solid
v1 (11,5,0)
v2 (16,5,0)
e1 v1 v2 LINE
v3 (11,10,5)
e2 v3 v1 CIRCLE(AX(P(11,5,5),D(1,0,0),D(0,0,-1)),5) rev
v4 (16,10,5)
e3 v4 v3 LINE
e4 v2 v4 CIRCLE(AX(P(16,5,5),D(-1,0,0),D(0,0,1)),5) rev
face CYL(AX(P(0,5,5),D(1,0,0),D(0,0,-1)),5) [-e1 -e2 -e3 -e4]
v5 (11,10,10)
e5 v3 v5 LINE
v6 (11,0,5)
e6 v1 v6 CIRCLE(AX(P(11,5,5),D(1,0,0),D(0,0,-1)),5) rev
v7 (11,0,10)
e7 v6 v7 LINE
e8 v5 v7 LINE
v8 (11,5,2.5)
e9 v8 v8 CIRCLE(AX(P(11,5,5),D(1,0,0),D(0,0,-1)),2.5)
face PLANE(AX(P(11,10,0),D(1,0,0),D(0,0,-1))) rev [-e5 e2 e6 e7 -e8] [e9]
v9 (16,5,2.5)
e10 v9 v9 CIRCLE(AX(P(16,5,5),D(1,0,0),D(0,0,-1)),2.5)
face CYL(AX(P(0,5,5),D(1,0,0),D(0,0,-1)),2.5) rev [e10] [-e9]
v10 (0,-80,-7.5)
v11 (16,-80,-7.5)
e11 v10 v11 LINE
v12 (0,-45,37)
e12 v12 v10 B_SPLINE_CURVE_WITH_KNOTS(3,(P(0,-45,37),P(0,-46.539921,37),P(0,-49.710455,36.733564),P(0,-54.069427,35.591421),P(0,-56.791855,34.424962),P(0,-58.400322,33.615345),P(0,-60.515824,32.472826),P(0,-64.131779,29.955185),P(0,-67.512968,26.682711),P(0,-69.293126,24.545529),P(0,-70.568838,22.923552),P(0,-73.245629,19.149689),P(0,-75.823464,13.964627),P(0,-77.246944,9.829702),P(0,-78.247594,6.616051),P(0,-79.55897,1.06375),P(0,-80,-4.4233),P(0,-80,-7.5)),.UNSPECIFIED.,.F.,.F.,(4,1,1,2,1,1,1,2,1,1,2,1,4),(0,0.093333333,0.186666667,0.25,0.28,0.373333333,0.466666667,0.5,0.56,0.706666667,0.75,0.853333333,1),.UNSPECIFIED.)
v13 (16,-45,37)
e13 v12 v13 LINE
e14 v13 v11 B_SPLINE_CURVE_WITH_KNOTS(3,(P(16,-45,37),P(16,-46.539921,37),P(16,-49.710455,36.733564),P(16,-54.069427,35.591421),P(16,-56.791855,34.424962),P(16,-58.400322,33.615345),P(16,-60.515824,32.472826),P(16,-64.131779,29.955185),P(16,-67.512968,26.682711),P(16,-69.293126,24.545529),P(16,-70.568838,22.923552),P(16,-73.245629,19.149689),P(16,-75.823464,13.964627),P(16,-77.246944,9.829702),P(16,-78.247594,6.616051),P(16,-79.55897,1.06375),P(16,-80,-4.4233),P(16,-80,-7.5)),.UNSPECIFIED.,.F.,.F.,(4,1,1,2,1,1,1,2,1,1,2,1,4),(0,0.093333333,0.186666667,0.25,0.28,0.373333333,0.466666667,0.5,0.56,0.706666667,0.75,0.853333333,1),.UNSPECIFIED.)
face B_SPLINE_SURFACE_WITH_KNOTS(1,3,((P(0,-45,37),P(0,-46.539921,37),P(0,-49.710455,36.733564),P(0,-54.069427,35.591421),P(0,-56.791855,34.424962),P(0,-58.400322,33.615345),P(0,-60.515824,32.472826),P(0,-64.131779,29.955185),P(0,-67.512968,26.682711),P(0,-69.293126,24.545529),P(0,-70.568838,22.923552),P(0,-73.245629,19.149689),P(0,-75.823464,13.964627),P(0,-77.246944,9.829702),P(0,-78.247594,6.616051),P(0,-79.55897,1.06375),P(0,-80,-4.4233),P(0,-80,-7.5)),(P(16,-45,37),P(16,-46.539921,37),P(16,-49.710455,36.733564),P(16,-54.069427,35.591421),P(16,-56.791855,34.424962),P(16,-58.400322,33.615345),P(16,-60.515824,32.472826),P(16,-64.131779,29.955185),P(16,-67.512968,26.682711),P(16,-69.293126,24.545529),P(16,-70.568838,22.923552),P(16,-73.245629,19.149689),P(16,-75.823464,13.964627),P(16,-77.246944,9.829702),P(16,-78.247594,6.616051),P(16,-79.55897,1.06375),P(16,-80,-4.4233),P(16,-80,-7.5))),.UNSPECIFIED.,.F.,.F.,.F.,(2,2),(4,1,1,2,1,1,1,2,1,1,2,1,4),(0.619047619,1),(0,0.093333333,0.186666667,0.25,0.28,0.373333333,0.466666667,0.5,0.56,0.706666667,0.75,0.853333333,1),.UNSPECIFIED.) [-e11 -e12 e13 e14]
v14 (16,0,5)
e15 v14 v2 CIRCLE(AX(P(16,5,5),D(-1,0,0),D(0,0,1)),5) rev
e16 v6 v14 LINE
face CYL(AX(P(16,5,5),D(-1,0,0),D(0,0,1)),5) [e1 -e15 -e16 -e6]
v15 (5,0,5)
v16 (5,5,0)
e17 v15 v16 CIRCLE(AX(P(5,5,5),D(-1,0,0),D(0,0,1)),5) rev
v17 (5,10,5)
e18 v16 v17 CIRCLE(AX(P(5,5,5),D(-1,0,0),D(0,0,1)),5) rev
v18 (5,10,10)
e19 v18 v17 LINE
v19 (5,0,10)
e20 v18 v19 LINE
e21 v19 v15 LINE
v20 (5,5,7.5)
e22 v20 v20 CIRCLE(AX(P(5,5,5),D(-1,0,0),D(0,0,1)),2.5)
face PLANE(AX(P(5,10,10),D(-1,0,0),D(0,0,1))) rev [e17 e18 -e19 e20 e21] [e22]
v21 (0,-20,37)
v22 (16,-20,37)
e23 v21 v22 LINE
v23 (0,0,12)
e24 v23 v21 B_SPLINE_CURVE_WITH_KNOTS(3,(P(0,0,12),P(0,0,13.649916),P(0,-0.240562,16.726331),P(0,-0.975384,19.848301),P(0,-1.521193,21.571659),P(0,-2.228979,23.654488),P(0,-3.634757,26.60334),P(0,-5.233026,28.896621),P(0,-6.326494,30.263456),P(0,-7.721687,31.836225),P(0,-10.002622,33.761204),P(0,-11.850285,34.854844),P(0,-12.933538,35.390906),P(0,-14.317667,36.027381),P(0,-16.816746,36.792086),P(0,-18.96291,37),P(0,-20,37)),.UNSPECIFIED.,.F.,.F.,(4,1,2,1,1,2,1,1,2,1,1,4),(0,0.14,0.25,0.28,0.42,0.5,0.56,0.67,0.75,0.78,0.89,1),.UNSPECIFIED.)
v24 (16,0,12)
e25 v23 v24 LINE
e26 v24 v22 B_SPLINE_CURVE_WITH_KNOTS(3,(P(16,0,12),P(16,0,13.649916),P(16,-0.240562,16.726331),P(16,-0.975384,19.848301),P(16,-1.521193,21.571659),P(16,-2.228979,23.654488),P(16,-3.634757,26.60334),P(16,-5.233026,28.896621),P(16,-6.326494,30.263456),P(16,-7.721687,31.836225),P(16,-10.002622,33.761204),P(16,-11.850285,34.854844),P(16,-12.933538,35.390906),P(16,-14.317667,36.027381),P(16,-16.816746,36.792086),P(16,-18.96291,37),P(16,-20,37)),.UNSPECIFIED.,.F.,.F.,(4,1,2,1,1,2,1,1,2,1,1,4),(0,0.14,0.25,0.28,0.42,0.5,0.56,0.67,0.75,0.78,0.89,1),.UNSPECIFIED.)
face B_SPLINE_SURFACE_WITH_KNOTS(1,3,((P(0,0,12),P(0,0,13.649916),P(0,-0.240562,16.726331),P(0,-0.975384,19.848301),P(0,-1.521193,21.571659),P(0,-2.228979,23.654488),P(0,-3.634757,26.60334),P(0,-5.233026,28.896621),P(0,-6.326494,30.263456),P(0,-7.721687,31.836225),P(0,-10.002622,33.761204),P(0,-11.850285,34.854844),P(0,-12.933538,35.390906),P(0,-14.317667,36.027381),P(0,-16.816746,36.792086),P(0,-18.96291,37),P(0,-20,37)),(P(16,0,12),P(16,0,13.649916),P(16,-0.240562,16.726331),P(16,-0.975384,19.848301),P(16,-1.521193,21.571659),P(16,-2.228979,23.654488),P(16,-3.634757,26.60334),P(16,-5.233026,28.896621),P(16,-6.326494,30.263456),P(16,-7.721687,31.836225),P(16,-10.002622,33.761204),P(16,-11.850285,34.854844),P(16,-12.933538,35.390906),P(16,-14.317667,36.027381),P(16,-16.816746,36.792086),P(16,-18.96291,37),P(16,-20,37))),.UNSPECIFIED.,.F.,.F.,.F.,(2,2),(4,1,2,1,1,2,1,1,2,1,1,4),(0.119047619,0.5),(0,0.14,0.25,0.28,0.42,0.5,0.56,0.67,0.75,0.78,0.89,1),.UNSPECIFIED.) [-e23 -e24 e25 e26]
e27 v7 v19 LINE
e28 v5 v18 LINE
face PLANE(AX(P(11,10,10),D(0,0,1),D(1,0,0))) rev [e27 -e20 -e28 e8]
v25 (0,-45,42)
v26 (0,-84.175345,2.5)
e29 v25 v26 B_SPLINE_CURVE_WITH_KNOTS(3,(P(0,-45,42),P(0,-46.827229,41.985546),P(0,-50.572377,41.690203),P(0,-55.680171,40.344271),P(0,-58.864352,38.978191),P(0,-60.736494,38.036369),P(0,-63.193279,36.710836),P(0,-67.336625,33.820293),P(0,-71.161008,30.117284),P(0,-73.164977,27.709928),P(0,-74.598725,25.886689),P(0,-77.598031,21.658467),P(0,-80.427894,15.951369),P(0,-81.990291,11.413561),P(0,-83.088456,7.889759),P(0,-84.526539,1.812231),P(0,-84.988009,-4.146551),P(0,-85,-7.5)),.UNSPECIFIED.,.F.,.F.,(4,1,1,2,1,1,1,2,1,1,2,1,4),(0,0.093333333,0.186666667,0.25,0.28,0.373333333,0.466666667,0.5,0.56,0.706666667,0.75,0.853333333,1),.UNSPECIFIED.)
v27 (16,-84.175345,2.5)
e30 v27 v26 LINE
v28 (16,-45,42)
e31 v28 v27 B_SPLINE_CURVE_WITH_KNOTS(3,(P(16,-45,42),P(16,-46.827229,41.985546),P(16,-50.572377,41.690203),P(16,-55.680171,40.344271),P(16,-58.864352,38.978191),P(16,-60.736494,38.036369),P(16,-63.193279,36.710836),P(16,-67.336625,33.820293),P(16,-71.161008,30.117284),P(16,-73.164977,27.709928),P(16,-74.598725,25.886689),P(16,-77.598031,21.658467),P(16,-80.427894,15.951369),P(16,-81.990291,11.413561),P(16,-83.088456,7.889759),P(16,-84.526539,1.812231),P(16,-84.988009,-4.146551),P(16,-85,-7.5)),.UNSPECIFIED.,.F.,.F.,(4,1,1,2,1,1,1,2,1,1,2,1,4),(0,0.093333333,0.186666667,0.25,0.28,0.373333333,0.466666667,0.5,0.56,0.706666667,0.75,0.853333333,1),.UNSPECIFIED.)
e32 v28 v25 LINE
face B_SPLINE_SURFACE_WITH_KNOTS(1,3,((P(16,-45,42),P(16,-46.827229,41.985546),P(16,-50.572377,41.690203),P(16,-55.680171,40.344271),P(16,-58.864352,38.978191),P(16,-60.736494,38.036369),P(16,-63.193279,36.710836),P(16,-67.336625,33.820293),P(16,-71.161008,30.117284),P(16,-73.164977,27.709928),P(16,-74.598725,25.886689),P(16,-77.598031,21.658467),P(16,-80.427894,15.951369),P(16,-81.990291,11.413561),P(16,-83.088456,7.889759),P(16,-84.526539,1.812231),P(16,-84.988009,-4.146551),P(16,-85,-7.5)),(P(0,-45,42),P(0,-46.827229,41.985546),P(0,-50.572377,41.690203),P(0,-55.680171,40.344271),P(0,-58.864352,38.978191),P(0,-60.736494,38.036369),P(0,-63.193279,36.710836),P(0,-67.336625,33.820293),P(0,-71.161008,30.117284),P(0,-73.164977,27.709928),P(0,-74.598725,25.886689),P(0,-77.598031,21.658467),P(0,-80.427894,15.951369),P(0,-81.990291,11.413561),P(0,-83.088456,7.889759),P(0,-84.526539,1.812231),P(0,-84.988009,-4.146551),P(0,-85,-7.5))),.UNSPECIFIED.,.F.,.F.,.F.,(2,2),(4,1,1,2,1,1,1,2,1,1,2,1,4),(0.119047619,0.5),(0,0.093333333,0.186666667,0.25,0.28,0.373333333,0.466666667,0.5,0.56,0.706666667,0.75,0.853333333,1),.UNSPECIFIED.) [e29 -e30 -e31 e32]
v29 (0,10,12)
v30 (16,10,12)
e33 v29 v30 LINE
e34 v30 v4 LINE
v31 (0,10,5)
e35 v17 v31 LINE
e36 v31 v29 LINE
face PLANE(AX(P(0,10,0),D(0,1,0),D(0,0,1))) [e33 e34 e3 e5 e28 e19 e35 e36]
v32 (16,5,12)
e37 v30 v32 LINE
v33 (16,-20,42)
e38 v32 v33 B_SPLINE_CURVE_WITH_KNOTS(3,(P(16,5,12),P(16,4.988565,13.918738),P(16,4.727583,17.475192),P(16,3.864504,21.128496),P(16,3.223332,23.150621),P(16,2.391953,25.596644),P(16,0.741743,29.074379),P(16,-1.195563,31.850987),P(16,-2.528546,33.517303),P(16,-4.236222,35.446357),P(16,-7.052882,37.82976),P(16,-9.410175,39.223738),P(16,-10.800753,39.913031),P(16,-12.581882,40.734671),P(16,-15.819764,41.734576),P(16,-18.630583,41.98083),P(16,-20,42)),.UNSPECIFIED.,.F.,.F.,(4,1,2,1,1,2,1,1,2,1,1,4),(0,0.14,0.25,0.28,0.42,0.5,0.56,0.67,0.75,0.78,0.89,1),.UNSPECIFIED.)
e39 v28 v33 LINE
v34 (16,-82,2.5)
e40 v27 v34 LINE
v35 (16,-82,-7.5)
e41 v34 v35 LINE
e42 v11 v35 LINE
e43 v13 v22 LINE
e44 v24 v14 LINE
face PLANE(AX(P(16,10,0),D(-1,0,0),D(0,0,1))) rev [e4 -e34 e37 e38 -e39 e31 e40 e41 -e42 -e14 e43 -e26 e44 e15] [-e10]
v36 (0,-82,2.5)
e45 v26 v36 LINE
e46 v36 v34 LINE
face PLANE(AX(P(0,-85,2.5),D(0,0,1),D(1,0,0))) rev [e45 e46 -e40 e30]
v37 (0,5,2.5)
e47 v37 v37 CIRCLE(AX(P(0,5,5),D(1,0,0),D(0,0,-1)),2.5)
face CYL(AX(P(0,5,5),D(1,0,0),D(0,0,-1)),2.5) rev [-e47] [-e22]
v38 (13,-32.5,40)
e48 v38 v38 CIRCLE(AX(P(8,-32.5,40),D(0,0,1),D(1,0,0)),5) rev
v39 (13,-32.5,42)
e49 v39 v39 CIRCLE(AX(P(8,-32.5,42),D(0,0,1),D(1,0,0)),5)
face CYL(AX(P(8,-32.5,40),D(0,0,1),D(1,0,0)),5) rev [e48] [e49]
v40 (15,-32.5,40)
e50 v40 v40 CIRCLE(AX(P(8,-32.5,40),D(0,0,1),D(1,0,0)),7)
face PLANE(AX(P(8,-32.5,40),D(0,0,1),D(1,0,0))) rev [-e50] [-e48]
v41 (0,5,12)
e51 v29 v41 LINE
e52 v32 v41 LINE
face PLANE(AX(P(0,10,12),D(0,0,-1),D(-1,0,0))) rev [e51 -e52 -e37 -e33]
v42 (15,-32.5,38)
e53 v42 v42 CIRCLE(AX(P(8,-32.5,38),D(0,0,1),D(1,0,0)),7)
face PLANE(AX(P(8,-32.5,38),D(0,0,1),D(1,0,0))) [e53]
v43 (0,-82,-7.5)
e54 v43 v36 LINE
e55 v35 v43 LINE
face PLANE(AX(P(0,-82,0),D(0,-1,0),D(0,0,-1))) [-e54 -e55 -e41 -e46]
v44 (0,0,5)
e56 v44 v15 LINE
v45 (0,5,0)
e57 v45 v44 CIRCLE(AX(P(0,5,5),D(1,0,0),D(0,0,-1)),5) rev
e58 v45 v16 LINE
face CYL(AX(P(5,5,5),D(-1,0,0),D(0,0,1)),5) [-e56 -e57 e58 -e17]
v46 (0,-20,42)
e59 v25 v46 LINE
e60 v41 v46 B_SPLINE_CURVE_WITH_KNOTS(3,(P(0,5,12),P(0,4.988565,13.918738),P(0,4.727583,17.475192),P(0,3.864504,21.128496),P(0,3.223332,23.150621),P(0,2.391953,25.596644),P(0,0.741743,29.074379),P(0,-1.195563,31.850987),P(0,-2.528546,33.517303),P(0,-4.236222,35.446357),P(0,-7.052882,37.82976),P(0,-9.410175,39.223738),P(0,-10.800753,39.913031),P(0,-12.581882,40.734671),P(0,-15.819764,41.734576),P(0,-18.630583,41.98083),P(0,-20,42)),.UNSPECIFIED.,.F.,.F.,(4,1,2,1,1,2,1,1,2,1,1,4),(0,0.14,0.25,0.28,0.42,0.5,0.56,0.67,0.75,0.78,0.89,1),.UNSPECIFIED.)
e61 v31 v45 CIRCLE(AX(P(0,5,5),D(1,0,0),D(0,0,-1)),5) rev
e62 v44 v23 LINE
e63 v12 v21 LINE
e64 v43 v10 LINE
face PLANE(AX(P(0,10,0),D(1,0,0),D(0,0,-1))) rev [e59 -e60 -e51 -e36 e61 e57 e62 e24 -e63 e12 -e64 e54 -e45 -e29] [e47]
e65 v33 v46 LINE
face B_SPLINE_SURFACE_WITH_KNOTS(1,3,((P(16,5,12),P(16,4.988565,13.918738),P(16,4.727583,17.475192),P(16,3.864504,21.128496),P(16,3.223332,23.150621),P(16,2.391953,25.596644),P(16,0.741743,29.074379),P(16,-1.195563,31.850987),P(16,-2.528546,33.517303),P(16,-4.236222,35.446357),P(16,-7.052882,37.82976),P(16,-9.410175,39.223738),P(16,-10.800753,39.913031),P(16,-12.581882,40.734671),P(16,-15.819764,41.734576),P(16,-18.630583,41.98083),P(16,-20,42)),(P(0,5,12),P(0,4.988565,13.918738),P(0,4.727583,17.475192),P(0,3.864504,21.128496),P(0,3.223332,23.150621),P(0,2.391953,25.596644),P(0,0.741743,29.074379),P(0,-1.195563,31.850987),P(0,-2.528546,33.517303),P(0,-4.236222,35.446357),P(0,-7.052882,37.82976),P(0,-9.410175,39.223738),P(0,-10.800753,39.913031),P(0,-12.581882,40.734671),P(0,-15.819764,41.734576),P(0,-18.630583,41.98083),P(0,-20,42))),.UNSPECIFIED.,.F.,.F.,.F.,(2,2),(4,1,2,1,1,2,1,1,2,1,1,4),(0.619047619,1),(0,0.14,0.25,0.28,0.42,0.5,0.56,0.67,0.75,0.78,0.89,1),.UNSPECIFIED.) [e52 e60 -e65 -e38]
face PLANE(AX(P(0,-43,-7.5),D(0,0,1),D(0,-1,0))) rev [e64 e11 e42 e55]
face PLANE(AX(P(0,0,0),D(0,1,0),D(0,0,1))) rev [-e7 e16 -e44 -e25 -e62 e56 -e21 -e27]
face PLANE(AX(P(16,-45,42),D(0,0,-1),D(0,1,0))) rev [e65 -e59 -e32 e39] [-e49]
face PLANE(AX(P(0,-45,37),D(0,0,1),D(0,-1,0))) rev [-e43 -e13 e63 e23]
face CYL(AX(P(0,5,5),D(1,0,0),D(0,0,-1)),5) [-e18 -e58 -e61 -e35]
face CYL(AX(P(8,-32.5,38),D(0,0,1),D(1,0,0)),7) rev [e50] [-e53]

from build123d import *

# Parameters (mm, degrees)
BOSS_EXTRUDE2_DEPTH     = 10
CUT_EXTRUDE1_DEPTH      = 20.104973175
CUT_EXTRUDE1_DEPTH_BACK = 20.104973175
SKETCH3_R               = 2.5
SWEEP2_DEPTH            = 16
SKETCH6_W               = 16
SKETCH6_H               = 5
BOSS_EXTRUDE3_DEPTH     = 25
SWEEP4_DEPTH            = 16
SKETCH10_R              = 5
CUT_EXTRUDE2_DEPTH      = 2
SKETCH11_R              = 7
CUT_EXTRUDE3_DEPTH      = 2
CUT_EXTRUDE4_DEPTH      = 3
FILLET1_R               = 5


# Read off the part's stored shape, not the designer's step: Sweep2, Sweep4
with BuildPart() as part:
    # Sketch1 → Boss-Extrude2 (new body)
    with BuildSketch(Plane(origin=(0, 0, 0), x_dir=(1, 0, 0), z_dir=(0, 1, 0))):
        Polygon((16, 0), (11, 0), (11, -10), (5, -10), (5, 0), (0, 0), (0, -12), (16, -12), align=None)
    extrude(amount=BOSS_EXTRUDE2_DEPTH)

    # Sketch3 → Cut-Extrude1 (cut, two sides: drawn at the far end of the back side and taken through both)
    with BuildSketch(Plane(origin=(5, 0, 0), x_dir=(0, 0, -1), z_dir=(1, 0, 0)).offset(-CUT_EXTRUDE1_DEPTH_BACK)):
        with Locations((-5, 5)):
            Circle(SKETCH3_R)
    extrude(amount=CUT_EXTRUDE1_DEPTH + CUT_EXTRUDE1_DEPTH_BACK, mode=Mode.SUBTRACT)

    # Sweep2 outline → Sweep2 (add)
    with BuildSketch(Plane.YZ):
        with BuildLine():
            Line((0, 12), (5, 12))
            add(Edge.make_bspline(
                [(5, 12), (4.988564835, 13.918737728), (4.727583023, 17.475192083), (3.864503942, 21.128495988), (3.223332084, 23.150620925), (2.391953002, 25.596644311), (0.741742694, 29.07437946), (-1.195562511, 31.850987055), (-2.528545692, 33.517302555), (-4.236222293, 35.44635739), (-7.052881596, 37.829760239), (-9.410175401, 39.223738473), (-10.800753457, 39.913031483), (-12.581881784, 40.734670966), (-15.819763626, 41.734575995), (-18.630582656, 41.980830062), (-20, 42)],
                knots=[0, 0, 0, 0, 0.14, 0.25, 0.25, 0.28, 0.42, 0.5, 0.5, 0.56, 0.67, 0.75, 0.75, 0.78, 0.89, 1, 1, 1, 1], degree=3))
            Line((-20, 42), (-20, 37))
            add(Edge.make_bspline(
                [(0, 12), (0, 13.649915823), (-0.240561875, 16.726331061), (-0.97538393, 19.848301285), (-1.521193083, 21.57165859), (-2.228979288, 23.654488426), (-3.634756743, 26.603340395), (-5.233025509, 28.896620946), (-6.326493526, 30.263455967), (-7.72168743, 31.836224776), (-10.002621636, 33.761203681), (-11.850285326, 34.854843846), (-12.93353849, 35.390906407), (-14.317667102, 36.027380757), (-16.81674582, 36.792085808), (-18.962910054, 37), (-20, 37)],
                knots=[0, 0, 0, 0, 0.14, 0.25, 0.25, 0.28, 0.42, 0.5, 0.5, 0.56, 0.67, 0.75, 0.75, 0.78, 0.89, 1, 1, 1, 1], degree=3))
        make_face()
    extrude(amount=SWEEP2_DEPTH)

    # Sketch6 → Boss-Extrude3 (add)
    with BuildSketch(Plane.XZ.offset(20)):
        with Locations((8, 39.5)):
            Rectangle(SKETCH6_W, SKETCH6_H)
    extrude(amount=BOSS_EXTRUDE3_DEPTH)

    # Sweep4 outline → Sweep4 (add)
    with BuildSketch(Plane.YZ):
        with BuildLine():
            add(Edge.make_bspline(
                [(-45, 37), (-46.539921435, 37), (-49.710455321, 36.733564359), (-54.069426949, 35.591421338), (-56.791855208, 34.424962301), (-58.400322026, 33.61534539), (-60.515823703, 32.472825795), (-64.131778614, 29.955184919), (-67.512968495, 26.682711344), (-69.293125668, 24.545529462), (-70.568838354, 22.923551904), (-73.245629189, 19.149689178), (-75.823464115, 13.964627374), (-77.246943912, 9.829702386), (-78.247594027, 6.616051335), (-79.558969896, 1.063749954), (-80, -4.423299828), (-80, -7.5)],
                knots=[0, 0, 0, 0, 0.093333333, 0.186666667, 0.25, 0.25, 0.28, 0.373333333, 0.466666667, 0.5, 0.5, 0.56, 0.706666667, 0.75, 0.75, 0.853333333, 1, 1, 1, 1], degree=3))
            Line((-45, 37), (-45, 42))
            add(Edge.make_bspline(
                [(-45, 42), (-46.827228691, 41.985546272), (-50.572377089, 41.690203176), (-55.680170711, 40.34427149), (-58.86435237, 38.978190659), (-60.736493627, 38.036368786), (-63.19327858, 36.710836458), (-67.336625432, 33.820292899), (-71.161008214, 30.117283698), (-73.164977368, 27.709927549), (-74.598724896, 25.886689015), (-77.598031299, 21.658467407), (-80.427894177, 15.95136859), (-81.990291212, 11.413560853), (-83.08845552, 7.889758882), (-84.526539356, 1.812231065), (-84.988008876, -4.14655051), (-85, -7.5)],
                knots=[0, 0, 0, 0, 0.093333333, 0.186666667, 0.25, 0.25, 0.28, 0.373333333, 0.466666667, 0.5, 0.5, 0.56, 0.706666667, 0.75, 0.75, 0.853333333, 1, 1, 1, 1], degree=3))
            Line((-85, -7.5), (-80, -7.5))
        make_face()
    extrude(amount=SWEEP4_DEPTH)

    # Sketch10 → Cut-Extrude2 (cut)
    with BuildSketch(Plane.XY.offset(42)):
        with Locations((8, -32.5)):
            Circle(SKETCH10_R)
    extrude(amount=-CUT_EXTRUDE2_DEPTH, mode=Mode.SUBTRACT)

    # Sketch11 → Cut-Extrude3 (cut)
    with BuildSketch(Plane.XY.offset(40)):
        with Locations((8, -32.5)):
            Circle(SKETCH11_R)
    extrude(amount=-CUT_EXTRUDE3_DEPTH, mode=Mode.SUBTRACT)

    # 3DSketch1 → Cut-Extrude4 (cut)
    with BuildSketch(Plane(origin=(0, -85, -7.5), x_dir=(0.8479983040050887, 0, 0.5299989400031789), z_dir=(0, 1, 0))):
        Polygon((0, 0), (13.567972864, 8.47998304), (18.867962264, 0), (5.2999894, -8.47998304), align=None)
    extrude(amount=CUT_EXTRUDE4_DEPTH, mode=Mode.SUBTRACT)

    # Fillet1
    fillet1_edges = [part.edges().sort_by_distance(p)[0] for p in [
        (13.5, 0, 0),
        (13.5, 10, 0),
        (2.5, 0, 0),
        (2.5, 10, 0),
    ]]
    fillet(fillet1_edges, radius=FILLET1_R - 0.0001)  # a hair under: the kernel refuses the full size


solid = part.part
